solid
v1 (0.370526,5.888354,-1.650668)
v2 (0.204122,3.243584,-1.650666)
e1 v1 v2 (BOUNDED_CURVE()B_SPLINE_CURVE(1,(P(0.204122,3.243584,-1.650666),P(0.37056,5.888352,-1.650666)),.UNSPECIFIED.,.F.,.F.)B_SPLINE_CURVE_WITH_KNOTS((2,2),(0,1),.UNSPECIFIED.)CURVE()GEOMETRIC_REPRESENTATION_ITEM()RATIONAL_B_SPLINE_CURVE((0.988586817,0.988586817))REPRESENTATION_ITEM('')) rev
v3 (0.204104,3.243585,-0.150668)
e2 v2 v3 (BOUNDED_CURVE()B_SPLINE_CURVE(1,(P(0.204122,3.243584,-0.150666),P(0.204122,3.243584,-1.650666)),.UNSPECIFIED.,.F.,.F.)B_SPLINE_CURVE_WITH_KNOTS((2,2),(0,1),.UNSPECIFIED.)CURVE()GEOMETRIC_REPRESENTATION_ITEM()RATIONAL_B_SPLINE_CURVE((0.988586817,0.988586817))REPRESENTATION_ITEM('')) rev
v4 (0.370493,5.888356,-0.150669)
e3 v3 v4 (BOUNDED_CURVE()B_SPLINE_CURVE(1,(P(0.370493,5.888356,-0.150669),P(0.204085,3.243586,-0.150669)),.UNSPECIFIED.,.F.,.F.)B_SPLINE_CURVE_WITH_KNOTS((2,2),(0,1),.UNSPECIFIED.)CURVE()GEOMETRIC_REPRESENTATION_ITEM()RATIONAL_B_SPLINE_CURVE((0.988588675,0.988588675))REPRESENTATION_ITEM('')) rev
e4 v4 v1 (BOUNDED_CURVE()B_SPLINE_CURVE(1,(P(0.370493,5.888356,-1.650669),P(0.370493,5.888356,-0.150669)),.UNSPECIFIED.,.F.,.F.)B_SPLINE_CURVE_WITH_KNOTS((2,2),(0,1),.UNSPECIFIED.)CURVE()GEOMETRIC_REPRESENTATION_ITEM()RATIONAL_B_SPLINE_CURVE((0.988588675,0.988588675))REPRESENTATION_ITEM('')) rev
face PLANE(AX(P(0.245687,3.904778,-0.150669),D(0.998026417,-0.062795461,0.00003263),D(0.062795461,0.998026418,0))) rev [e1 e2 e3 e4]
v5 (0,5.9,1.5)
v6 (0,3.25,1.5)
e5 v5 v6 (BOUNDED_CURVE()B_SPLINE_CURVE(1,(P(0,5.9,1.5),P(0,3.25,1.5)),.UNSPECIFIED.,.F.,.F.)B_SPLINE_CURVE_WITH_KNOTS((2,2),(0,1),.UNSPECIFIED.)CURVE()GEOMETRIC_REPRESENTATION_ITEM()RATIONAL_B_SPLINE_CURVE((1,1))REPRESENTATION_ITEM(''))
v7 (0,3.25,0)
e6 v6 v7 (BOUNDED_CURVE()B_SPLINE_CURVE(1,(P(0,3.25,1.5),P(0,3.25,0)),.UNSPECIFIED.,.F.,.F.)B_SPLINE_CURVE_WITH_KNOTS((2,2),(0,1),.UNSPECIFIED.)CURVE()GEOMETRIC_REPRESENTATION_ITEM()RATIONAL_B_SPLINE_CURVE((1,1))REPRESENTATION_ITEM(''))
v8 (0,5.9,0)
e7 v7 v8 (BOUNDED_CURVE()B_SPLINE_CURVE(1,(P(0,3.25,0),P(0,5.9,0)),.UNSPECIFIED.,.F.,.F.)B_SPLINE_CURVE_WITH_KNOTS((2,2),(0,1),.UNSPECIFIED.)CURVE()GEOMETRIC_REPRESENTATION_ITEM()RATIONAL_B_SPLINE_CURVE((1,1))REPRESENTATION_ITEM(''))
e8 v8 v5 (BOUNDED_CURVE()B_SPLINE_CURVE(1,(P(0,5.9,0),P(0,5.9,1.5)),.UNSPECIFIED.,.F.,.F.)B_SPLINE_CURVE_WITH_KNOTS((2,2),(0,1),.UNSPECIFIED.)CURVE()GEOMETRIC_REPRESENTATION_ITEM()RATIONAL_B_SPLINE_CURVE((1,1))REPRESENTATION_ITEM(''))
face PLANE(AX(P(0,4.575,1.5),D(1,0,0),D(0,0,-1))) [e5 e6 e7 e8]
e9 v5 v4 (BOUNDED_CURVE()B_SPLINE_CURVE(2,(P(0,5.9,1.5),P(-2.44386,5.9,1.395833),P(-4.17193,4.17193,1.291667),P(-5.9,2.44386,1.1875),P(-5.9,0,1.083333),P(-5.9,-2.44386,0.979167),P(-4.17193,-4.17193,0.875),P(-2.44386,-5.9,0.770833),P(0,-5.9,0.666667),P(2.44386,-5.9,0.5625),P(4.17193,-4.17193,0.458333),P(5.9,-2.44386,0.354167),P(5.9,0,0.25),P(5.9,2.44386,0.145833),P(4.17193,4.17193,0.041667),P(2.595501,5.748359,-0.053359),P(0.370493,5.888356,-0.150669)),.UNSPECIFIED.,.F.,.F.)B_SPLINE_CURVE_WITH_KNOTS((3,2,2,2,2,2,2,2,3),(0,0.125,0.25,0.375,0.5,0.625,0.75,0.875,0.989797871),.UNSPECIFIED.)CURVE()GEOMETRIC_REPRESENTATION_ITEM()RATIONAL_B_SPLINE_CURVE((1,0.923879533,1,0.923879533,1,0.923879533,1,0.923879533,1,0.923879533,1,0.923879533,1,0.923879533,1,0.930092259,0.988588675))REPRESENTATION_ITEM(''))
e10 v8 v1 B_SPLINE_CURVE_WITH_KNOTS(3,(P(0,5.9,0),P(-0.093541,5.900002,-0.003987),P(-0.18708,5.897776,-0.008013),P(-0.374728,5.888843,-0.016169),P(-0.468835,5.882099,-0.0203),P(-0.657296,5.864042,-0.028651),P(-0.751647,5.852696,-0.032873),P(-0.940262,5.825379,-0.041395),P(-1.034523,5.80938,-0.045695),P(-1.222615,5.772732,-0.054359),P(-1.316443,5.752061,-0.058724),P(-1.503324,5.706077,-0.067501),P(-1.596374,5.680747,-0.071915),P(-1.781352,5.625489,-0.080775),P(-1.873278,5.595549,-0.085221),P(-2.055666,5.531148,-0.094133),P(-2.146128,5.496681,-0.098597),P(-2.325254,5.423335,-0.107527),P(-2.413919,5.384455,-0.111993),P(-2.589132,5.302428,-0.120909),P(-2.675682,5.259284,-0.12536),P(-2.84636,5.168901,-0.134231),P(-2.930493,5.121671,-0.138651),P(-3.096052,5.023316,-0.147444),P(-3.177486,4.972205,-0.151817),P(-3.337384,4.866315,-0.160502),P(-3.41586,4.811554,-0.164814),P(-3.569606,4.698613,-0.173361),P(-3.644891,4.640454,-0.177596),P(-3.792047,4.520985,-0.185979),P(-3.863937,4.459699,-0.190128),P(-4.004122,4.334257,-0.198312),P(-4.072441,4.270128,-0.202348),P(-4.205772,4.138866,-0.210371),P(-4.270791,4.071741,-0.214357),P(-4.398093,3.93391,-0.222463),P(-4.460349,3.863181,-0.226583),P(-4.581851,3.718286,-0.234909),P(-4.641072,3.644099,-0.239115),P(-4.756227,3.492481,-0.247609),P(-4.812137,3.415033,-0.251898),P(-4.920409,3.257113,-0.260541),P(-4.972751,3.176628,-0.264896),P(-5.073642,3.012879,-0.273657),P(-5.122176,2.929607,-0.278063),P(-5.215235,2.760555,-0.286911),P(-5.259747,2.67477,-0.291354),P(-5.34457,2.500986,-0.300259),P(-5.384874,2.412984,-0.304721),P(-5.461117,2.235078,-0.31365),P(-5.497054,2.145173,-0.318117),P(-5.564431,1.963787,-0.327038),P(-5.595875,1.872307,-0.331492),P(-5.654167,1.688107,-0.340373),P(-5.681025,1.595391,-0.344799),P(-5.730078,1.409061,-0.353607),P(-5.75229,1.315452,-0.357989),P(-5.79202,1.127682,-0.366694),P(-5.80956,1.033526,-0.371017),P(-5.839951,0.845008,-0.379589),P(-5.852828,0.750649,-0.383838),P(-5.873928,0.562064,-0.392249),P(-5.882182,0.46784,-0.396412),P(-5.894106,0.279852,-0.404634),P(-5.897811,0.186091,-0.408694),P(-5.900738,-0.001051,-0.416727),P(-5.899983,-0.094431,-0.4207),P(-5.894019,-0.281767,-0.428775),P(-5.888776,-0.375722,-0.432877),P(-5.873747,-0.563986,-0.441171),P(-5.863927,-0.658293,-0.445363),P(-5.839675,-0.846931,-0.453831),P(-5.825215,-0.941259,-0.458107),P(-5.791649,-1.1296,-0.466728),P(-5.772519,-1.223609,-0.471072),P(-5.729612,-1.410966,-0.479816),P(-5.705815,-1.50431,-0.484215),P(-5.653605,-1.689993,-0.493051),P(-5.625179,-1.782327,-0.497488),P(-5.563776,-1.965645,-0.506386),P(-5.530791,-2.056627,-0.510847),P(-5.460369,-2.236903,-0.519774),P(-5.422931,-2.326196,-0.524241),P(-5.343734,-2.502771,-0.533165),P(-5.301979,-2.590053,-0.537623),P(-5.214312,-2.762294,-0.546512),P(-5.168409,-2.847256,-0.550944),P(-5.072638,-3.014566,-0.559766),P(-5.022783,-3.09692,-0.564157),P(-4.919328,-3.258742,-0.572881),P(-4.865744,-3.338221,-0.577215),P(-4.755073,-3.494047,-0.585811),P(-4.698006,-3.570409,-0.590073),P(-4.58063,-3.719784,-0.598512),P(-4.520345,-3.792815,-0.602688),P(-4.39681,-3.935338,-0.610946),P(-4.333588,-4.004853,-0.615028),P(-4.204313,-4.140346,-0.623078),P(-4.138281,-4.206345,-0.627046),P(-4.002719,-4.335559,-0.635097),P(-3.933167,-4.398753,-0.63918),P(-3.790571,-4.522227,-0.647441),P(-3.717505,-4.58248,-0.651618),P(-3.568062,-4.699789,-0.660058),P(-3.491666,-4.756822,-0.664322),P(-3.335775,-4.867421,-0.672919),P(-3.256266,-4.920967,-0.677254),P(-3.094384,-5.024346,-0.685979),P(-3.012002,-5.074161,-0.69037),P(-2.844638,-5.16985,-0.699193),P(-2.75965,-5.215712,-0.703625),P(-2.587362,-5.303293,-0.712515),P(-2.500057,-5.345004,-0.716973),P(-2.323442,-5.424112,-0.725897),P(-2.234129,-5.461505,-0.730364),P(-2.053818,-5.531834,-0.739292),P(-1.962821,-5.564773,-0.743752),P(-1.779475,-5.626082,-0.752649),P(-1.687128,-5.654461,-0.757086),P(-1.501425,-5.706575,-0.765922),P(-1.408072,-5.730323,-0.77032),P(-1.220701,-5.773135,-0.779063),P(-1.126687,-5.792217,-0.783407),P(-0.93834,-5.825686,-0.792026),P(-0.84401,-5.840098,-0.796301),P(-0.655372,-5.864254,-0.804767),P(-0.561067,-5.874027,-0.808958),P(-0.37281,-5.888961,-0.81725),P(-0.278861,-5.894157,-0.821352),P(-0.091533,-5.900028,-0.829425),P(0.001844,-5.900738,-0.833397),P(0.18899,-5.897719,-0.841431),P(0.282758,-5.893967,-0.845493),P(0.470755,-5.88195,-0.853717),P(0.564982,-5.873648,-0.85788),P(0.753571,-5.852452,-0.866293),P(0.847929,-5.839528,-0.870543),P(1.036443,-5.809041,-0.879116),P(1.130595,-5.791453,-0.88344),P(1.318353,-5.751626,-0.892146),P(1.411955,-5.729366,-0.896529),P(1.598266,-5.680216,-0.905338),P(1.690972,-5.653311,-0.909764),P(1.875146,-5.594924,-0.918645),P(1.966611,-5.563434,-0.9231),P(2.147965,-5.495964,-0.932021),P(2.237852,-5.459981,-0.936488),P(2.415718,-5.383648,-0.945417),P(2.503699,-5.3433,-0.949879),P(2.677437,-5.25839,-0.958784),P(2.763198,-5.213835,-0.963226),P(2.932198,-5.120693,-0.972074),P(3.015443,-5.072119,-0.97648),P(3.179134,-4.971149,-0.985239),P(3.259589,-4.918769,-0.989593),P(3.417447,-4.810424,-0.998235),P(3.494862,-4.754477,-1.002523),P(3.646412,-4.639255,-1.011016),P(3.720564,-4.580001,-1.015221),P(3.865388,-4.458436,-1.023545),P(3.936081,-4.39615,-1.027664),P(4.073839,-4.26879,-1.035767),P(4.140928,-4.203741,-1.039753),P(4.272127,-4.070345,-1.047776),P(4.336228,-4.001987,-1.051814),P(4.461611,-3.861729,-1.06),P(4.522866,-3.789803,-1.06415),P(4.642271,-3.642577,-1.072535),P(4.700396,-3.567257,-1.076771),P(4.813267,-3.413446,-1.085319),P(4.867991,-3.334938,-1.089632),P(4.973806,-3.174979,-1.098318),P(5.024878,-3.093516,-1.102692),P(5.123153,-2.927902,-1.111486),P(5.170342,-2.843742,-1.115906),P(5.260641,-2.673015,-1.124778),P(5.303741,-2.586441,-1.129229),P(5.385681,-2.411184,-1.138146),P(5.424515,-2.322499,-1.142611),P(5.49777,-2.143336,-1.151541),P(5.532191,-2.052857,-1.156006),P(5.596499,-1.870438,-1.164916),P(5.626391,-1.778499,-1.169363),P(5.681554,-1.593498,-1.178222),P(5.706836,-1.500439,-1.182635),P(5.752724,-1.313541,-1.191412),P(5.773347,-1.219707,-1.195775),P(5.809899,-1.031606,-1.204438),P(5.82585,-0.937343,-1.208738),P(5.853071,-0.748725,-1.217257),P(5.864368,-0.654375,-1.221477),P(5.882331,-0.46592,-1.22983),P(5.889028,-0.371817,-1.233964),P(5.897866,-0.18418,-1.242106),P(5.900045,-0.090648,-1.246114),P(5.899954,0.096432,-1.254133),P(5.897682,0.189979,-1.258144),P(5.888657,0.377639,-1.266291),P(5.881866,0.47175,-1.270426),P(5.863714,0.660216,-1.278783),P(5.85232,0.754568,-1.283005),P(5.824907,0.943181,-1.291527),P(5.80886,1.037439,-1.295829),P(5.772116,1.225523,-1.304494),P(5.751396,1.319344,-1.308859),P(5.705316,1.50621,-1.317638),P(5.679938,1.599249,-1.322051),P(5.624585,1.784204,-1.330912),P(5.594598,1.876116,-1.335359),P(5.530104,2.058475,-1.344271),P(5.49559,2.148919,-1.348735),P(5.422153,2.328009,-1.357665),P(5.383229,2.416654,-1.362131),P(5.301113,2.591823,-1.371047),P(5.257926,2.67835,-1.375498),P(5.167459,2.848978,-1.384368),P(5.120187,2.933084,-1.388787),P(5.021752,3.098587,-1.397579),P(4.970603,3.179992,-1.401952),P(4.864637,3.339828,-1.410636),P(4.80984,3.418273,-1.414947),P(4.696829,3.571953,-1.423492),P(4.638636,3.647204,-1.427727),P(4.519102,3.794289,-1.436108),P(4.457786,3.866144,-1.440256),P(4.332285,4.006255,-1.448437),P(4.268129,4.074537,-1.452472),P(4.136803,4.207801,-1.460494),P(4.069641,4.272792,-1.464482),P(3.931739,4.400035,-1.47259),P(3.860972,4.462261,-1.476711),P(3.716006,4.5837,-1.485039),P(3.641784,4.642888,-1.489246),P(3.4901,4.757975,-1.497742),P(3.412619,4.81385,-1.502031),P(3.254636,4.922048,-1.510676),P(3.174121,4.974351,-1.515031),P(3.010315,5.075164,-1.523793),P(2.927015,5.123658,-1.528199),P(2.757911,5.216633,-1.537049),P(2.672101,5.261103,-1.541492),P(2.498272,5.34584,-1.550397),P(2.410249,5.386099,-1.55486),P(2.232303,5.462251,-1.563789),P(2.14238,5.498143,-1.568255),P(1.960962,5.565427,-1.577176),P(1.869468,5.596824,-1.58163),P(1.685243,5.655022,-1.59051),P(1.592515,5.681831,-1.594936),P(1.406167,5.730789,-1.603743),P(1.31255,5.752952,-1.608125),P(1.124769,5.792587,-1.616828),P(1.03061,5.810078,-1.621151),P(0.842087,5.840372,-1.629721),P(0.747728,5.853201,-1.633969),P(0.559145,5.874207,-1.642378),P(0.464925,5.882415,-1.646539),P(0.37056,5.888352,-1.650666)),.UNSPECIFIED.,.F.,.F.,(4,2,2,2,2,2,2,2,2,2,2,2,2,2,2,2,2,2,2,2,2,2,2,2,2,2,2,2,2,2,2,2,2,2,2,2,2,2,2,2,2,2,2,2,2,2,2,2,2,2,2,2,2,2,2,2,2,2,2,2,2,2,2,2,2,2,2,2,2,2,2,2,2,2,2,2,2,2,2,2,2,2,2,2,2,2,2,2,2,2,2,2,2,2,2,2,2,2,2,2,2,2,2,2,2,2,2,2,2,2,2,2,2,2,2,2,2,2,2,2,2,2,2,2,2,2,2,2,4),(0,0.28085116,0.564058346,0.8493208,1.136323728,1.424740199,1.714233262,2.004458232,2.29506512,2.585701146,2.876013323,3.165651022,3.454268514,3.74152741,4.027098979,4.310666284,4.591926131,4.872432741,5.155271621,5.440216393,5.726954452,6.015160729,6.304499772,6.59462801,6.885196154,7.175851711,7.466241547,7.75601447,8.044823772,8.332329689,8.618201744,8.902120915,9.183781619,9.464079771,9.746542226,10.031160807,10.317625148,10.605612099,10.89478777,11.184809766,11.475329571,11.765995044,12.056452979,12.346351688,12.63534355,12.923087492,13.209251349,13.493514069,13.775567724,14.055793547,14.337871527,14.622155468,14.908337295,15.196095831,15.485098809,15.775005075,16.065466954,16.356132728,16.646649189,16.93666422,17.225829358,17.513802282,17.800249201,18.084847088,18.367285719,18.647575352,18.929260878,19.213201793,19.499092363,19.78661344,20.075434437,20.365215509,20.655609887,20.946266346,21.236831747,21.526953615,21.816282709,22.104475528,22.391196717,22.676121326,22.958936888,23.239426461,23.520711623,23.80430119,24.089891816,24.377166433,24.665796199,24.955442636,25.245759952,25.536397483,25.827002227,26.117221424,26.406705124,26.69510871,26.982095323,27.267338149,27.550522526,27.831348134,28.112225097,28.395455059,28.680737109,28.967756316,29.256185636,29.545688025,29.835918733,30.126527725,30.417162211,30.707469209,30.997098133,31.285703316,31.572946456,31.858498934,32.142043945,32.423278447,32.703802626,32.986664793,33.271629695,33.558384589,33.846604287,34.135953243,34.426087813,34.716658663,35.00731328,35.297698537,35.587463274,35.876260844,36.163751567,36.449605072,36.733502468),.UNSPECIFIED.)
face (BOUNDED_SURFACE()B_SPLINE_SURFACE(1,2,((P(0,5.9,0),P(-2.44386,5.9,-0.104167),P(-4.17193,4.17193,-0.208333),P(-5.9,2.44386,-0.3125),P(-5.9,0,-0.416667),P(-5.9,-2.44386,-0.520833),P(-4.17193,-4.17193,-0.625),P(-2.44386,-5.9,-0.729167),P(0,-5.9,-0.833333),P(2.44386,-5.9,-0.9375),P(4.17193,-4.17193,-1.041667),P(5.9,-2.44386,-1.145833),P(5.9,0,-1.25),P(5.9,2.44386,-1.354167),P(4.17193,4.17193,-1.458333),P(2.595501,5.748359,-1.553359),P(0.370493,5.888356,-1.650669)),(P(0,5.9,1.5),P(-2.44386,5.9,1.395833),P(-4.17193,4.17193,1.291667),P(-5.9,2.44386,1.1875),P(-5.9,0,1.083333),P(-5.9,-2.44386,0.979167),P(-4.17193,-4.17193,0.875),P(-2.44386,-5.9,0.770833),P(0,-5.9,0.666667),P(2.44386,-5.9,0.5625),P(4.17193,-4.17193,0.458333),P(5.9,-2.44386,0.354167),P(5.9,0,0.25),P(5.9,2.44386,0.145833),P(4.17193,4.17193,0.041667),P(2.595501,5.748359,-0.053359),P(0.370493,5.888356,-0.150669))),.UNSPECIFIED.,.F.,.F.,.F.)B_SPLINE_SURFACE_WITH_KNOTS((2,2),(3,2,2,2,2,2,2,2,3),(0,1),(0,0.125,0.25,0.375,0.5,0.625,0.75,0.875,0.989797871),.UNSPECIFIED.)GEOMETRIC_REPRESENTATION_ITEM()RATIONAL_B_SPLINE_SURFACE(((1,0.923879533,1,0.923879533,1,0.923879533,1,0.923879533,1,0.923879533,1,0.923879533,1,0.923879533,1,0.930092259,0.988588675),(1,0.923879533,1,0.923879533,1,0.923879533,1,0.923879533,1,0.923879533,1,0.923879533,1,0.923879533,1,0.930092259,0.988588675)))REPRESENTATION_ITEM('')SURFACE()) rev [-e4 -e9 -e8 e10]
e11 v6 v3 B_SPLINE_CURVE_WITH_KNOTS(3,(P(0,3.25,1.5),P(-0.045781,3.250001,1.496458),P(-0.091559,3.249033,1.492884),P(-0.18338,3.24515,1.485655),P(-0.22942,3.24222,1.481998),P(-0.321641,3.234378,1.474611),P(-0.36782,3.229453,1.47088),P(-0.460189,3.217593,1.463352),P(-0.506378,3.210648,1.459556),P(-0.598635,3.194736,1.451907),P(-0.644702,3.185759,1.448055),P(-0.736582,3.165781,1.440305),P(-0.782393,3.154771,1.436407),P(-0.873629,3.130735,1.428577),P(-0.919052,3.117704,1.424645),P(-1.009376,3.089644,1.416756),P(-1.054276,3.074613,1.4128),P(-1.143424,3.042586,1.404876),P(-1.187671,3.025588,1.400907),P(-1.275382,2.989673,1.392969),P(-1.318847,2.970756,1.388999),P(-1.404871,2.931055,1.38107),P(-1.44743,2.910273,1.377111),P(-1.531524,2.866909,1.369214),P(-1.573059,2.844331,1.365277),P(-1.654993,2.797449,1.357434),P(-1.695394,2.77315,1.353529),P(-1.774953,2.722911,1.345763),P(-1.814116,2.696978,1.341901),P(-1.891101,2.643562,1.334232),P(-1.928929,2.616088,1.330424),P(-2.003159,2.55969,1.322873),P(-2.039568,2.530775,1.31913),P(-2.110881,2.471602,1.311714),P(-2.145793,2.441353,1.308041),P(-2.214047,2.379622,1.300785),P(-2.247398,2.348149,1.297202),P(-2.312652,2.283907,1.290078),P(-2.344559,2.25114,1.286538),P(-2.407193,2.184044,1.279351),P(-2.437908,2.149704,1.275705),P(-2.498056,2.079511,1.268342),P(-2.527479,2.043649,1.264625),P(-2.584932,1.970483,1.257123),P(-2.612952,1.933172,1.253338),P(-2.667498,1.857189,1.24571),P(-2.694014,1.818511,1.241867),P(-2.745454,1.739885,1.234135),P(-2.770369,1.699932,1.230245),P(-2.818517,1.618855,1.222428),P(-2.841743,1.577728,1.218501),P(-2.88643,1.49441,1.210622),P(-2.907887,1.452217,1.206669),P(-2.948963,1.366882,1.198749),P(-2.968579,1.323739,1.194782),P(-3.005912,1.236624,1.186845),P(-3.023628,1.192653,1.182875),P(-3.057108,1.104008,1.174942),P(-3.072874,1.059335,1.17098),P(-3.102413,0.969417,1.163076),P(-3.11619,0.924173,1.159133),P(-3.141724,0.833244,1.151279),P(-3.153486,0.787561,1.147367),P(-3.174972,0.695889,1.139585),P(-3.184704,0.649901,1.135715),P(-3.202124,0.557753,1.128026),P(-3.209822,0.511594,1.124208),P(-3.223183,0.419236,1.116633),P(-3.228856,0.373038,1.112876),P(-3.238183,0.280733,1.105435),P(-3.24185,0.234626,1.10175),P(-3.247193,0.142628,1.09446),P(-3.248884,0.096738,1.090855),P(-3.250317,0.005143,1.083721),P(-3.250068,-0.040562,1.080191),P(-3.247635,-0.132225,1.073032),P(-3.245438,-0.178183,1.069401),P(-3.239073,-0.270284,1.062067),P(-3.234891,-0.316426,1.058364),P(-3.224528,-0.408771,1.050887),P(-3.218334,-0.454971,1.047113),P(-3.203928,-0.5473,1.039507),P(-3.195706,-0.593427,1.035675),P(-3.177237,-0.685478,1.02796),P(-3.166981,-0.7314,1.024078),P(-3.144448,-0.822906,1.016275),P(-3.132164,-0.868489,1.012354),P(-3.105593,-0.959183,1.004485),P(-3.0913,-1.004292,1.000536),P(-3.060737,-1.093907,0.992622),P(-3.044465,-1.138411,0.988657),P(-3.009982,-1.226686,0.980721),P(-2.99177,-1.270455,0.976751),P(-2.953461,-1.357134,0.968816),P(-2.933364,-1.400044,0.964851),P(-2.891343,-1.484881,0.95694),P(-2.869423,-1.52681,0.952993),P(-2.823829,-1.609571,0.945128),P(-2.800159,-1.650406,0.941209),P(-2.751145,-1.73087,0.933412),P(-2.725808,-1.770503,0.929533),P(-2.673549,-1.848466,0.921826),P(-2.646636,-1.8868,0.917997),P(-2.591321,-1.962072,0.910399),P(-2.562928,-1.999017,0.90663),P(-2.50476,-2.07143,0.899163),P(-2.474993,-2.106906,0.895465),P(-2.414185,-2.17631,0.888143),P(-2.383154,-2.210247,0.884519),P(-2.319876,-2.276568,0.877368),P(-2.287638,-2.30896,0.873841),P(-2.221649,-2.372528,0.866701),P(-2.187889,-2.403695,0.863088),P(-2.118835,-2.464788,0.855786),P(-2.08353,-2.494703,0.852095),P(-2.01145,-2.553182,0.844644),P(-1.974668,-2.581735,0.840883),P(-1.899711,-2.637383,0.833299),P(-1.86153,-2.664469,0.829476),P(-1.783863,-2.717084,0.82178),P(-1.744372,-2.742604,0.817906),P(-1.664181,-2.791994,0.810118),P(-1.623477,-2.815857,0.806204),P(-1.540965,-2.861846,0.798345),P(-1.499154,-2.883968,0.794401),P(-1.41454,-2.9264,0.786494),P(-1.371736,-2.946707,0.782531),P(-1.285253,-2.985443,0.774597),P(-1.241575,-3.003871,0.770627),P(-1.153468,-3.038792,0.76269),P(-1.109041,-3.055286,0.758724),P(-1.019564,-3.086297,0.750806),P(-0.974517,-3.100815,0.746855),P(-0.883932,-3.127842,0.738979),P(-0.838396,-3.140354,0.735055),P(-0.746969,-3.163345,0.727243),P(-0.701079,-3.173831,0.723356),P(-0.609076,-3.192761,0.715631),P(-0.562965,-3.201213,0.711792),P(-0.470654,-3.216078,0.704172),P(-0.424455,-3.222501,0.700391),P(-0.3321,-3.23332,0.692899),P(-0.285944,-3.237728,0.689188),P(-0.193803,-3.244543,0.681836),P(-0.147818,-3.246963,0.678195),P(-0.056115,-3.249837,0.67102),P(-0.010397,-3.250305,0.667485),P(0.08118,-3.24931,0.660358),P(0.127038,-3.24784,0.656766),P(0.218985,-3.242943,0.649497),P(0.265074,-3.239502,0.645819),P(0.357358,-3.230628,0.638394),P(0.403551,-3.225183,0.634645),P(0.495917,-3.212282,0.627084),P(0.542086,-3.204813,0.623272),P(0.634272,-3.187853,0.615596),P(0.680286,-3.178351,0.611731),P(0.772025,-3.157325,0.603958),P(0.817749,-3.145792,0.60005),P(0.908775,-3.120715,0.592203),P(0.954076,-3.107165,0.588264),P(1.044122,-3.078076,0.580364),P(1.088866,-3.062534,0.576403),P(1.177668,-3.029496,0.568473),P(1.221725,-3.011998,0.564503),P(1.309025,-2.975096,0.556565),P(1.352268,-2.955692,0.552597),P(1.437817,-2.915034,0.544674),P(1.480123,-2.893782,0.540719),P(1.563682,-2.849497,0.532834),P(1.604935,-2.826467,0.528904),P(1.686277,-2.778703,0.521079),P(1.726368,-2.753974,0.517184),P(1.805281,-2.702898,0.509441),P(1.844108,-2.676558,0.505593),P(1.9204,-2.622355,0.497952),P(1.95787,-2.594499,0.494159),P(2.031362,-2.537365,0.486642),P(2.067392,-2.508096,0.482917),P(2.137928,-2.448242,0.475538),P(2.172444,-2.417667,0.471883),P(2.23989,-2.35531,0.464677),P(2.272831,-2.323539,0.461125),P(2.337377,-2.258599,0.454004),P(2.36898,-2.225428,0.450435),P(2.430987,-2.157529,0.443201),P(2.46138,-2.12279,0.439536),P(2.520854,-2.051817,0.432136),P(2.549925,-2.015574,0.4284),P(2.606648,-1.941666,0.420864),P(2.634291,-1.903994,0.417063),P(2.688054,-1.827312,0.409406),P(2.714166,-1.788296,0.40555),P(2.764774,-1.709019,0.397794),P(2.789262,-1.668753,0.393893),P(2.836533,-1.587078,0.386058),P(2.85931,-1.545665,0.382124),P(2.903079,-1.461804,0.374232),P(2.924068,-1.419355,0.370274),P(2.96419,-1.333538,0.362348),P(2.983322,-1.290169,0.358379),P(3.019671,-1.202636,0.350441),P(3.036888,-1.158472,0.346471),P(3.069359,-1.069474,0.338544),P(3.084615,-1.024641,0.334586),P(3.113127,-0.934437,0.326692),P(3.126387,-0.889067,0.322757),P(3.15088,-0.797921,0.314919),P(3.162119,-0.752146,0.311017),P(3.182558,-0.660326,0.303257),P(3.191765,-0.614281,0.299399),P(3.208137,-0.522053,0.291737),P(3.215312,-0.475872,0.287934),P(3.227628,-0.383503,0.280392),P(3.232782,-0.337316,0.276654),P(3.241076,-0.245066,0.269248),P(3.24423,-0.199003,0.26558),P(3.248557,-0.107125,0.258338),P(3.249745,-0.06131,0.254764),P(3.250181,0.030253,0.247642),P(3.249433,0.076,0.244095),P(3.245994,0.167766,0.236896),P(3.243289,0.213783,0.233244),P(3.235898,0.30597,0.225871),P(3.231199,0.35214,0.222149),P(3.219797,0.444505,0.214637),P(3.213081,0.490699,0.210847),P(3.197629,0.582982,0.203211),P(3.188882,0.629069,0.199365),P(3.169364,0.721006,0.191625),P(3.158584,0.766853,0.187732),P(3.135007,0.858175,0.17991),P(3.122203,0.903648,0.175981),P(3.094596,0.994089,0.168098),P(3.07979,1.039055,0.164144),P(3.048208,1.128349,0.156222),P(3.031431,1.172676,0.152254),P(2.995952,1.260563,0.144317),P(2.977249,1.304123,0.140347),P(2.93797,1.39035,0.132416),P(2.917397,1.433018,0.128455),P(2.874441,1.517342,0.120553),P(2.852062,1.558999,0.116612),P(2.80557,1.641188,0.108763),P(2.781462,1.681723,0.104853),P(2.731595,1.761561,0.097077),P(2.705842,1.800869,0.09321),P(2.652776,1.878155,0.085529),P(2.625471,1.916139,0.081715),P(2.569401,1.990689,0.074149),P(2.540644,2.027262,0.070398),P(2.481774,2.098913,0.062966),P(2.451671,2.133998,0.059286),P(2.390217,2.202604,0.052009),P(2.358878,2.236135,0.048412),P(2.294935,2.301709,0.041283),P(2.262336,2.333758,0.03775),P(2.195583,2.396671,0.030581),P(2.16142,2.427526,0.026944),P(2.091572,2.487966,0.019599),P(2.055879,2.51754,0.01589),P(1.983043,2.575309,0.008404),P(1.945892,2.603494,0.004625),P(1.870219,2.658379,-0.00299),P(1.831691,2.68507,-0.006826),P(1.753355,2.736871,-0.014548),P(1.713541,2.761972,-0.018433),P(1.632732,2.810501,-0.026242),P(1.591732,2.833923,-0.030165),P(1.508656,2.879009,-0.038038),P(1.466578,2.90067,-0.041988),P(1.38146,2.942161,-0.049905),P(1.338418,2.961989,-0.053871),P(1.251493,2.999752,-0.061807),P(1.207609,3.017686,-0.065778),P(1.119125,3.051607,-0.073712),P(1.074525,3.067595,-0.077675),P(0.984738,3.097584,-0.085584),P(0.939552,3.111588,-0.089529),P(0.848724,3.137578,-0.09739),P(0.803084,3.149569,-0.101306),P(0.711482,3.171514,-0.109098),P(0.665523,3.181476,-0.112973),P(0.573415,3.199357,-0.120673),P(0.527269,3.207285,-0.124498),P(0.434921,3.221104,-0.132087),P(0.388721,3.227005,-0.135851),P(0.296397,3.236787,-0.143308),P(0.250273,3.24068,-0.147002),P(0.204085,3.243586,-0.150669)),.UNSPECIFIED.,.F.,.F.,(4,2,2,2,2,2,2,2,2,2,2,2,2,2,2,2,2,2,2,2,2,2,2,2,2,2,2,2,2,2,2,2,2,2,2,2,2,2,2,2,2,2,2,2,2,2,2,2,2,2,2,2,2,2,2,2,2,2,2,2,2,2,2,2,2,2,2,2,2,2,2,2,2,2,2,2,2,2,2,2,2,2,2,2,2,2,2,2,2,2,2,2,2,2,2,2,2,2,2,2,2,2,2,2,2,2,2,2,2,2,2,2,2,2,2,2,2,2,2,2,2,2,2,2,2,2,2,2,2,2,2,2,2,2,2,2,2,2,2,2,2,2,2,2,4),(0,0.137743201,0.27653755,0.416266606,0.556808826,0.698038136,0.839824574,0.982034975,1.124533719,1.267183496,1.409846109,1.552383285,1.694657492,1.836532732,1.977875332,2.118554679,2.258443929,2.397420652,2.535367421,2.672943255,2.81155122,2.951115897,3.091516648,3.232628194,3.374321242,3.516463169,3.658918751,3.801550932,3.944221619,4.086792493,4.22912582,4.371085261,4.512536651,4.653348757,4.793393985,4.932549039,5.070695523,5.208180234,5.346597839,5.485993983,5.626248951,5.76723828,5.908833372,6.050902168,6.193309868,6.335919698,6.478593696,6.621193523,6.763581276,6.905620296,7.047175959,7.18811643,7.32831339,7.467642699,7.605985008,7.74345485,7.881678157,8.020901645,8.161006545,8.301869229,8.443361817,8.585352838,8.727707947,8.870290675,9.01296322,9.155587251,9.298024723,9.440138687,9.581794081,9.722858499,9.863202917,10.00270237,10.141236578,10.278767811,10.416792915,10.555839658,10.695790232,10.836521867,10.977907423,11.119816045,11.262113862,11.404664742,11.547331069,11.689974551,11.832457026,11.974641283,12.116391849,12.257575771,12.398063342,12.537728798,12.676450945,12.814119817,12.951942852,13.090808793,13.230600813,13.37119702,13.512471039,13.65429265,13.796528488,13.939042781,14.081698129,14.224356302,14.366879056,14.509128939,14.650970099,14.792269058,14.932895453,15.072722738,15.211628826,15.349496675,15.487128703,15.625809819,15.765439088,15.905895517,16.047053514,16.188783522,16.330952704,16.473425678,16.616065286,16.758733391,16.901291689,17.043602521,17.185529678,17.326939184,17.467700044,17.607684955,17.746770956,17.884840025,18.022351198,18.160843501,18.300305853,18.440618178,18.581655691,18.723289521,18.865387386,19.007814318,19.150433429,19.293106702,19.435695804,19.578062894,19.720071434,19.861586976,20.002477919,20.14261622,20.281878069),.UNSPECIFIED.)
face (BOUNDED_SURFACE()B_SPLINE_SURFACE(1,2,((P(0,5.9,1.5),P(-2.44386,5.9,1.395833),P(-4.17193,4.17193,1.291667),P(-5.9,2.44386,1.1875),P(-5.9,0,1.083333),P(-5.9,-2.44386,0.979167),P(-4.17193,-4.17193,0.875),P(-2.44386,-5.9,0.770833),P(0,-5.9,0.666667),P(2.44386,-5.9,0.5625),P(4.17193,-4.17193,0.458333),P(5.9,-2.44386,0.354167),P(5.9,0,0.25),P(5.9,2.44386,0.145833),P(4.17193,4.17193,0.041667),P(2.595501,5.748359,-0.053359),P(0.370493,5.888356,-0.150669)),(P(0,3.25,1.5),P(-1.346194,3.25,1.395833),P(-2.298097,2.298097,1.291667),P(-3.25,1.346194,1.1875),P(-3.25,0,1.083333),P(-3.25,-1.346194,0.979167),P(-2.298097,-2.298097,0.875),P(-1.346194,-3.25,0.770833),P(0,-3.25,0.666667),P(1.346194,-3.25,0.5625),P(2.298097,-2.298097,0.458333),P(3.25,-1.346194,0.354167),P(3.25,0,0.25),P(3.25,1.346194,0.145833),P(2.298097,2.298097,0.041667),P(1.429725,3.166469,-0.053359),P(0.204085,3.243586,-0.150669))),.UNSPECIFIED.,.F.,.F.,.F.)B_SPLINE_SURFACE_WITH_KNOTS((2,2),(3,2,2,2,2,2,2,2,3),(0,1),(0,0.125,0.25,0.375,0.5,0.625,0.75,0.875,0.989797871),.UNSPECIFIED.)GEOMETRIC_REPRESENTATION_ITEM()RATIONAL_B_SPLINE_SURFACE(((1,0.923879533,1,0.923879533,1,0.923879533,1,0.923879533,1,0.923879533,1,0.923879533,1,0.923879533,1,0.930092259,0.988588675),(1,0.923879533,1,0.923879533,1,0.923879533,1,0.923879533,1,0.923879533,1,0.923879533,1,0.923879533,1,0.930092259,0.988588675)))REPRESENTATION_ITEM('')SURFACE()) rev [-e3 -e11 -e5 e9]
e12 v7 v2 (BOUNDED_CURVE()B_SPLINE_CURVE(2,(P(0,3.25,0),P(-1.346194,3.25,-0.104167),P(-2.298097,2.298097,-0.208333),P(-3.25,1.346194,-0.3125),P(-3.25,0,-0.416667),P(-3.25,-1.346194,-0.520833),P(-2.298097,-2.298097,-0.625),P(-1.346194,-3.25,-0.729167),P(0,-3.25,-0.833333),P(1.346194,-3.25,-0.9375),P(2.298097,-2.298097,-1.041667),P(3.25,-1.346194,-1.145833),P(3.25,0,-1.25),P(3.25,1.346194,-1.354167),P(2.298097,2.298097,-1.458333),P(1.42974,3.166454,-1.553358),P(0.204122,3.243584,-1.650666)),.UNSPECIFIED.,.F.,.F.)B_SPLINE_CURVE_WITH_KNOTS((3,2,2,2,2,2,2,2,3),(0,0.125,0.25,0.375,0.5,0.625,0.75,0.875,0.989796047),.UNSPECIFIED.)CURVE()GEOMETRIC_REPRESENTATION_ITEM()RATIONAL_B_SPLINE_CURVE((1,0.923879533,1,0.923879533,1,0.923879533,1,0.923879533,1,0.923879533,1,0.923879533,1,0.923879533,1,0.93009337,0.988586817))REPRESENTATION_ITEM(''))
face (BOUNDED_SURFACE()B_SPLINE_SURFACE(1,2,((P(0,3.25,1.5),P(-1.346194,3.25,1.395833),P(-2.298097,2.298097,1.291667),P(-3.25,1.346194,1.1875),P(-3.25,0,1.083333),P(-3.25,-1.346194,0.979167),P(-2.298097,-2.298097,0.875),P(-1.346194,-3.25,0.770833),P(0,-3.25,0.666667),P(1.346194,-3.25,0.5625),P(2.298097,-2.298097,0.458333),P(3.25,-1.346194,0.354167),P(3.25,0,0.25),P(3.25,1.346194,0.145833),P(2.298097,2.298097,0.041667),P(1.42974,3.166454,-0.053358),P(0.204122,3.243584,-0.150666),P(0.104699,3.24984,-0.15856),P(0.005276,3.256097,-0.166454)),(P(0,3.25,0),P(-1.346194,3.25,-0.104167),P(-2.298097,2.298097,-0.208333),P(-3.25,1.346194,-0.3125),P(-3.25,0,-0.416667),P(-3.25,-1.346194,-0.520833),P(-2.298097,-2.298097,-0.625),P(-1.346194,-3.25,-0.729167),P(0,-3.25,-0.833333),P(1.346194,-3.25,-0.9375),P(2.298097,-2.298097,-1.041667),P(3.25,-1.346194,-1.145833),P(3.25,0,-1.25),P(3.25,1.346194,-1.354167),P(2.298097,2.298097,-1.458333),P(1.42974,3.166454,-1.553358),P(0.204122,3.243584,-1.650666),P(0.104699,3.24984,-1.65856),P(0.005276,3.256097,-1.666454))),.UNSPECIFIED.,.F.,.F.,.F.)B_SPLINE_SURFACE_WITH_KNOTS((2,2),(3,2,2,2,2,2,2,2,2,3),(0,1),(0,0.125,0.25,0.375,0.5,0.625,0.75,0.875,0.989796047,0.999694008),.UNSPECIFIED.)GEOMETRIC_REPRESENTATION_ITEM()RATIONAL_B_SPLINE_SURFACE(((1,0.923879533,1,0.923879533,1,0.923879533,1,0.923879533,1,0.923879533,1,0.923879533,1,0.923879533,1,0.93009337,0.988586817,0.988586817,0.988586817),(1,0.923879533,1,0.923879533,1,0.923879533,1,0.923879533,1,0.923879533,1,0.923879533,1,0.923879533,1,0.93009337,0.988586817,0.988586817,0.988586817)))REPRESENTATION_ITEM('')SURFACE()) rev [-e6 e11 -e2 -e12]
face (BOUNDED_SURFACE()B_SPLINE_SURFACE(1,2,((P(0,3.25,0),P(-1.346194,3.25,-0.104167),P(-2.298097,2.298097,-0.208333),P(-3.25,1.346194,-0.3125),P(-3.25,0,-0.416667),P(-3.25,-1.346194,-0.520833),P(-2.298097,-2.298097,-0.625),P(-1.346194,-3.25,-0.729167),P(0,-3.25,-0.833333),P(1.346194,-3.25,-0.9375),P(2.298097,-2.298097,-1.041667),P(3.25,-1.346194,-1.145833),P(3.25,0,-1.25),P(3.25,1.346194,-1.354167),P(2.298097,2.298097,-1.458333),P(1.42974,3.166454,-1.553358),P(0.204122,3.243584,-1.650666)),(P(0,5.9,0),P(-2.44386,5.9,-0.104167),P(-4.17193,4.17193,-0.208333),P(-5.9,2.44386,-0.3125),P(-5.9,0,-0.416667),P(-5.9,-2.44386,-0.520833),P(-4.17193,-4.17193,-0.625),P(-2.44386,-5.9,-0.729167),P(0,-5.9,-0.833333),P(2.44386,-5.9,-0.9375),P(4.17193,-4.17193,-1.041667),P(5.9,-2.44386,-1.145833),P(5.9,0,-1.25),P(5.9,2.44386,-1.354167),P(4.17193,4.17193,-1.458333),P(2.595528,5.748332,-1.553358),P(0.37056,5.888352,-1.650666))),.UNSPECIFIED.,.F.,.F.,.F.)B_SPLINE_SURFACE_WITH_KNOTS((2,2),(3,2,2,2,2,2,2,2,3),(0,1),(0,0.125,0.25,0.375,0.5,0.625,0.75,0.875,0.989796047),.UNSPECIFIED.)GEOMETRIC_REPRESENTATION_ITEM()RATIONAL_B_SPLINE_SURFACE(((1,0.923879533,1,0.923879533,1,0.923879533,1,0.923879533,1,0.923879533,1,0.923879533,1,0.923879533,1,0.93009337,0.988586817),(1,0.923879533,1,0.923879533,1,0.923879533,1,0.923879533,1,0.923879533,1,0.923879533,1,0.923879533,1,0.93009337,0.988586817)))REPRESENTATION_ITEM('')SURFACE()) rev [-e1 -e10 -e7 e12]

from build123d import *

# Parameters (mm, degrees)
SWEEP1_PITCH = 1.666666667


with BuildPart() as part:
    # Sweep1: the profile of Sketch2 screwed along a left-hand helix of 0.99 turns, 8 arcs to a turn; built about Z, then put on its axis
    sweep1_z = Axis((0, 0, 0), (0, 0, 1))
    sweep1_corners = [(5.9, 0, 0), (5.9, 0, -1.5), (3.25, 0, -1.5), (3.25, 0, 0)]
    with BuildLine(mode=Mode.PRIVATE) as sweep1_profile:
        Line(sweep1_corners[0], sweep1_corners[1])
        Line(sweep1_corners[1], sweep1_corners[2])
        Line(sweep1_corners[2], sweep1_corners[3])
        Line(sweep1_corners[3], sweep1_corners[0])
    sweep1_cap = Face(sweep1_profile.wire())
    sweep1_turn_angles = [0, -22.5, -45, -67.5, -90, -112.5, -135, -157.5, -180, -202.5, -225, -247.5, -270, -292.5, -315, -335.7, -356.4]
    sweep1_turn_weights = [1, 0.9238795325112867, 1, 0.9238795325112867, 1, 0.9238795325112867, 1, 0.9238795325112867, 1, 0.9238795325112867, 1, 0.9238795325112867, 1, 0.9238795325112867, 1, 0.9354440308298649, 1]
    sweep1_turn_rails = [Edge.make_bspline([Vector(p[0], p[1], 0).rotate(sweep1_z, sweep1_turn_angles[k]) / sweep1_turn_weights[k] + Vector(0, 0, p[2] + -SWEEP1_PITCH * sweep1_turn_angles[k] / 360) for k in range(17)], [0, 0, 0, 1, 1, 2, 2, 3, 3, 4, 4, 5, 5, 6, 6, 7, 7, 8, 8, 8], 2, sweep1_turn_weights) for p in sweep1_corners]
    sweep1_turn_sides = [Face.make_surface_from_curves(sweep1_turn_rails[p[0]], sweep1_turn_rails[p[1]]) for p in [(0, 1), (1, 2), (2, 3), (3, 0)]]
    sweep1 = Plane(origin=(0, 0, 0), x_dir=(0, 1, 0), z_dir=(0, 0, -1)) * Solid(Shell([*sweep1_turn_sides, sweep1_cap, sweep1_cap.rotate(sweep1_z, -356.4).moved(Location((0, 0, -SWEEP1_PITCH * -356.4 / 360)))]))
    add(sweep1)


solid = part.part
